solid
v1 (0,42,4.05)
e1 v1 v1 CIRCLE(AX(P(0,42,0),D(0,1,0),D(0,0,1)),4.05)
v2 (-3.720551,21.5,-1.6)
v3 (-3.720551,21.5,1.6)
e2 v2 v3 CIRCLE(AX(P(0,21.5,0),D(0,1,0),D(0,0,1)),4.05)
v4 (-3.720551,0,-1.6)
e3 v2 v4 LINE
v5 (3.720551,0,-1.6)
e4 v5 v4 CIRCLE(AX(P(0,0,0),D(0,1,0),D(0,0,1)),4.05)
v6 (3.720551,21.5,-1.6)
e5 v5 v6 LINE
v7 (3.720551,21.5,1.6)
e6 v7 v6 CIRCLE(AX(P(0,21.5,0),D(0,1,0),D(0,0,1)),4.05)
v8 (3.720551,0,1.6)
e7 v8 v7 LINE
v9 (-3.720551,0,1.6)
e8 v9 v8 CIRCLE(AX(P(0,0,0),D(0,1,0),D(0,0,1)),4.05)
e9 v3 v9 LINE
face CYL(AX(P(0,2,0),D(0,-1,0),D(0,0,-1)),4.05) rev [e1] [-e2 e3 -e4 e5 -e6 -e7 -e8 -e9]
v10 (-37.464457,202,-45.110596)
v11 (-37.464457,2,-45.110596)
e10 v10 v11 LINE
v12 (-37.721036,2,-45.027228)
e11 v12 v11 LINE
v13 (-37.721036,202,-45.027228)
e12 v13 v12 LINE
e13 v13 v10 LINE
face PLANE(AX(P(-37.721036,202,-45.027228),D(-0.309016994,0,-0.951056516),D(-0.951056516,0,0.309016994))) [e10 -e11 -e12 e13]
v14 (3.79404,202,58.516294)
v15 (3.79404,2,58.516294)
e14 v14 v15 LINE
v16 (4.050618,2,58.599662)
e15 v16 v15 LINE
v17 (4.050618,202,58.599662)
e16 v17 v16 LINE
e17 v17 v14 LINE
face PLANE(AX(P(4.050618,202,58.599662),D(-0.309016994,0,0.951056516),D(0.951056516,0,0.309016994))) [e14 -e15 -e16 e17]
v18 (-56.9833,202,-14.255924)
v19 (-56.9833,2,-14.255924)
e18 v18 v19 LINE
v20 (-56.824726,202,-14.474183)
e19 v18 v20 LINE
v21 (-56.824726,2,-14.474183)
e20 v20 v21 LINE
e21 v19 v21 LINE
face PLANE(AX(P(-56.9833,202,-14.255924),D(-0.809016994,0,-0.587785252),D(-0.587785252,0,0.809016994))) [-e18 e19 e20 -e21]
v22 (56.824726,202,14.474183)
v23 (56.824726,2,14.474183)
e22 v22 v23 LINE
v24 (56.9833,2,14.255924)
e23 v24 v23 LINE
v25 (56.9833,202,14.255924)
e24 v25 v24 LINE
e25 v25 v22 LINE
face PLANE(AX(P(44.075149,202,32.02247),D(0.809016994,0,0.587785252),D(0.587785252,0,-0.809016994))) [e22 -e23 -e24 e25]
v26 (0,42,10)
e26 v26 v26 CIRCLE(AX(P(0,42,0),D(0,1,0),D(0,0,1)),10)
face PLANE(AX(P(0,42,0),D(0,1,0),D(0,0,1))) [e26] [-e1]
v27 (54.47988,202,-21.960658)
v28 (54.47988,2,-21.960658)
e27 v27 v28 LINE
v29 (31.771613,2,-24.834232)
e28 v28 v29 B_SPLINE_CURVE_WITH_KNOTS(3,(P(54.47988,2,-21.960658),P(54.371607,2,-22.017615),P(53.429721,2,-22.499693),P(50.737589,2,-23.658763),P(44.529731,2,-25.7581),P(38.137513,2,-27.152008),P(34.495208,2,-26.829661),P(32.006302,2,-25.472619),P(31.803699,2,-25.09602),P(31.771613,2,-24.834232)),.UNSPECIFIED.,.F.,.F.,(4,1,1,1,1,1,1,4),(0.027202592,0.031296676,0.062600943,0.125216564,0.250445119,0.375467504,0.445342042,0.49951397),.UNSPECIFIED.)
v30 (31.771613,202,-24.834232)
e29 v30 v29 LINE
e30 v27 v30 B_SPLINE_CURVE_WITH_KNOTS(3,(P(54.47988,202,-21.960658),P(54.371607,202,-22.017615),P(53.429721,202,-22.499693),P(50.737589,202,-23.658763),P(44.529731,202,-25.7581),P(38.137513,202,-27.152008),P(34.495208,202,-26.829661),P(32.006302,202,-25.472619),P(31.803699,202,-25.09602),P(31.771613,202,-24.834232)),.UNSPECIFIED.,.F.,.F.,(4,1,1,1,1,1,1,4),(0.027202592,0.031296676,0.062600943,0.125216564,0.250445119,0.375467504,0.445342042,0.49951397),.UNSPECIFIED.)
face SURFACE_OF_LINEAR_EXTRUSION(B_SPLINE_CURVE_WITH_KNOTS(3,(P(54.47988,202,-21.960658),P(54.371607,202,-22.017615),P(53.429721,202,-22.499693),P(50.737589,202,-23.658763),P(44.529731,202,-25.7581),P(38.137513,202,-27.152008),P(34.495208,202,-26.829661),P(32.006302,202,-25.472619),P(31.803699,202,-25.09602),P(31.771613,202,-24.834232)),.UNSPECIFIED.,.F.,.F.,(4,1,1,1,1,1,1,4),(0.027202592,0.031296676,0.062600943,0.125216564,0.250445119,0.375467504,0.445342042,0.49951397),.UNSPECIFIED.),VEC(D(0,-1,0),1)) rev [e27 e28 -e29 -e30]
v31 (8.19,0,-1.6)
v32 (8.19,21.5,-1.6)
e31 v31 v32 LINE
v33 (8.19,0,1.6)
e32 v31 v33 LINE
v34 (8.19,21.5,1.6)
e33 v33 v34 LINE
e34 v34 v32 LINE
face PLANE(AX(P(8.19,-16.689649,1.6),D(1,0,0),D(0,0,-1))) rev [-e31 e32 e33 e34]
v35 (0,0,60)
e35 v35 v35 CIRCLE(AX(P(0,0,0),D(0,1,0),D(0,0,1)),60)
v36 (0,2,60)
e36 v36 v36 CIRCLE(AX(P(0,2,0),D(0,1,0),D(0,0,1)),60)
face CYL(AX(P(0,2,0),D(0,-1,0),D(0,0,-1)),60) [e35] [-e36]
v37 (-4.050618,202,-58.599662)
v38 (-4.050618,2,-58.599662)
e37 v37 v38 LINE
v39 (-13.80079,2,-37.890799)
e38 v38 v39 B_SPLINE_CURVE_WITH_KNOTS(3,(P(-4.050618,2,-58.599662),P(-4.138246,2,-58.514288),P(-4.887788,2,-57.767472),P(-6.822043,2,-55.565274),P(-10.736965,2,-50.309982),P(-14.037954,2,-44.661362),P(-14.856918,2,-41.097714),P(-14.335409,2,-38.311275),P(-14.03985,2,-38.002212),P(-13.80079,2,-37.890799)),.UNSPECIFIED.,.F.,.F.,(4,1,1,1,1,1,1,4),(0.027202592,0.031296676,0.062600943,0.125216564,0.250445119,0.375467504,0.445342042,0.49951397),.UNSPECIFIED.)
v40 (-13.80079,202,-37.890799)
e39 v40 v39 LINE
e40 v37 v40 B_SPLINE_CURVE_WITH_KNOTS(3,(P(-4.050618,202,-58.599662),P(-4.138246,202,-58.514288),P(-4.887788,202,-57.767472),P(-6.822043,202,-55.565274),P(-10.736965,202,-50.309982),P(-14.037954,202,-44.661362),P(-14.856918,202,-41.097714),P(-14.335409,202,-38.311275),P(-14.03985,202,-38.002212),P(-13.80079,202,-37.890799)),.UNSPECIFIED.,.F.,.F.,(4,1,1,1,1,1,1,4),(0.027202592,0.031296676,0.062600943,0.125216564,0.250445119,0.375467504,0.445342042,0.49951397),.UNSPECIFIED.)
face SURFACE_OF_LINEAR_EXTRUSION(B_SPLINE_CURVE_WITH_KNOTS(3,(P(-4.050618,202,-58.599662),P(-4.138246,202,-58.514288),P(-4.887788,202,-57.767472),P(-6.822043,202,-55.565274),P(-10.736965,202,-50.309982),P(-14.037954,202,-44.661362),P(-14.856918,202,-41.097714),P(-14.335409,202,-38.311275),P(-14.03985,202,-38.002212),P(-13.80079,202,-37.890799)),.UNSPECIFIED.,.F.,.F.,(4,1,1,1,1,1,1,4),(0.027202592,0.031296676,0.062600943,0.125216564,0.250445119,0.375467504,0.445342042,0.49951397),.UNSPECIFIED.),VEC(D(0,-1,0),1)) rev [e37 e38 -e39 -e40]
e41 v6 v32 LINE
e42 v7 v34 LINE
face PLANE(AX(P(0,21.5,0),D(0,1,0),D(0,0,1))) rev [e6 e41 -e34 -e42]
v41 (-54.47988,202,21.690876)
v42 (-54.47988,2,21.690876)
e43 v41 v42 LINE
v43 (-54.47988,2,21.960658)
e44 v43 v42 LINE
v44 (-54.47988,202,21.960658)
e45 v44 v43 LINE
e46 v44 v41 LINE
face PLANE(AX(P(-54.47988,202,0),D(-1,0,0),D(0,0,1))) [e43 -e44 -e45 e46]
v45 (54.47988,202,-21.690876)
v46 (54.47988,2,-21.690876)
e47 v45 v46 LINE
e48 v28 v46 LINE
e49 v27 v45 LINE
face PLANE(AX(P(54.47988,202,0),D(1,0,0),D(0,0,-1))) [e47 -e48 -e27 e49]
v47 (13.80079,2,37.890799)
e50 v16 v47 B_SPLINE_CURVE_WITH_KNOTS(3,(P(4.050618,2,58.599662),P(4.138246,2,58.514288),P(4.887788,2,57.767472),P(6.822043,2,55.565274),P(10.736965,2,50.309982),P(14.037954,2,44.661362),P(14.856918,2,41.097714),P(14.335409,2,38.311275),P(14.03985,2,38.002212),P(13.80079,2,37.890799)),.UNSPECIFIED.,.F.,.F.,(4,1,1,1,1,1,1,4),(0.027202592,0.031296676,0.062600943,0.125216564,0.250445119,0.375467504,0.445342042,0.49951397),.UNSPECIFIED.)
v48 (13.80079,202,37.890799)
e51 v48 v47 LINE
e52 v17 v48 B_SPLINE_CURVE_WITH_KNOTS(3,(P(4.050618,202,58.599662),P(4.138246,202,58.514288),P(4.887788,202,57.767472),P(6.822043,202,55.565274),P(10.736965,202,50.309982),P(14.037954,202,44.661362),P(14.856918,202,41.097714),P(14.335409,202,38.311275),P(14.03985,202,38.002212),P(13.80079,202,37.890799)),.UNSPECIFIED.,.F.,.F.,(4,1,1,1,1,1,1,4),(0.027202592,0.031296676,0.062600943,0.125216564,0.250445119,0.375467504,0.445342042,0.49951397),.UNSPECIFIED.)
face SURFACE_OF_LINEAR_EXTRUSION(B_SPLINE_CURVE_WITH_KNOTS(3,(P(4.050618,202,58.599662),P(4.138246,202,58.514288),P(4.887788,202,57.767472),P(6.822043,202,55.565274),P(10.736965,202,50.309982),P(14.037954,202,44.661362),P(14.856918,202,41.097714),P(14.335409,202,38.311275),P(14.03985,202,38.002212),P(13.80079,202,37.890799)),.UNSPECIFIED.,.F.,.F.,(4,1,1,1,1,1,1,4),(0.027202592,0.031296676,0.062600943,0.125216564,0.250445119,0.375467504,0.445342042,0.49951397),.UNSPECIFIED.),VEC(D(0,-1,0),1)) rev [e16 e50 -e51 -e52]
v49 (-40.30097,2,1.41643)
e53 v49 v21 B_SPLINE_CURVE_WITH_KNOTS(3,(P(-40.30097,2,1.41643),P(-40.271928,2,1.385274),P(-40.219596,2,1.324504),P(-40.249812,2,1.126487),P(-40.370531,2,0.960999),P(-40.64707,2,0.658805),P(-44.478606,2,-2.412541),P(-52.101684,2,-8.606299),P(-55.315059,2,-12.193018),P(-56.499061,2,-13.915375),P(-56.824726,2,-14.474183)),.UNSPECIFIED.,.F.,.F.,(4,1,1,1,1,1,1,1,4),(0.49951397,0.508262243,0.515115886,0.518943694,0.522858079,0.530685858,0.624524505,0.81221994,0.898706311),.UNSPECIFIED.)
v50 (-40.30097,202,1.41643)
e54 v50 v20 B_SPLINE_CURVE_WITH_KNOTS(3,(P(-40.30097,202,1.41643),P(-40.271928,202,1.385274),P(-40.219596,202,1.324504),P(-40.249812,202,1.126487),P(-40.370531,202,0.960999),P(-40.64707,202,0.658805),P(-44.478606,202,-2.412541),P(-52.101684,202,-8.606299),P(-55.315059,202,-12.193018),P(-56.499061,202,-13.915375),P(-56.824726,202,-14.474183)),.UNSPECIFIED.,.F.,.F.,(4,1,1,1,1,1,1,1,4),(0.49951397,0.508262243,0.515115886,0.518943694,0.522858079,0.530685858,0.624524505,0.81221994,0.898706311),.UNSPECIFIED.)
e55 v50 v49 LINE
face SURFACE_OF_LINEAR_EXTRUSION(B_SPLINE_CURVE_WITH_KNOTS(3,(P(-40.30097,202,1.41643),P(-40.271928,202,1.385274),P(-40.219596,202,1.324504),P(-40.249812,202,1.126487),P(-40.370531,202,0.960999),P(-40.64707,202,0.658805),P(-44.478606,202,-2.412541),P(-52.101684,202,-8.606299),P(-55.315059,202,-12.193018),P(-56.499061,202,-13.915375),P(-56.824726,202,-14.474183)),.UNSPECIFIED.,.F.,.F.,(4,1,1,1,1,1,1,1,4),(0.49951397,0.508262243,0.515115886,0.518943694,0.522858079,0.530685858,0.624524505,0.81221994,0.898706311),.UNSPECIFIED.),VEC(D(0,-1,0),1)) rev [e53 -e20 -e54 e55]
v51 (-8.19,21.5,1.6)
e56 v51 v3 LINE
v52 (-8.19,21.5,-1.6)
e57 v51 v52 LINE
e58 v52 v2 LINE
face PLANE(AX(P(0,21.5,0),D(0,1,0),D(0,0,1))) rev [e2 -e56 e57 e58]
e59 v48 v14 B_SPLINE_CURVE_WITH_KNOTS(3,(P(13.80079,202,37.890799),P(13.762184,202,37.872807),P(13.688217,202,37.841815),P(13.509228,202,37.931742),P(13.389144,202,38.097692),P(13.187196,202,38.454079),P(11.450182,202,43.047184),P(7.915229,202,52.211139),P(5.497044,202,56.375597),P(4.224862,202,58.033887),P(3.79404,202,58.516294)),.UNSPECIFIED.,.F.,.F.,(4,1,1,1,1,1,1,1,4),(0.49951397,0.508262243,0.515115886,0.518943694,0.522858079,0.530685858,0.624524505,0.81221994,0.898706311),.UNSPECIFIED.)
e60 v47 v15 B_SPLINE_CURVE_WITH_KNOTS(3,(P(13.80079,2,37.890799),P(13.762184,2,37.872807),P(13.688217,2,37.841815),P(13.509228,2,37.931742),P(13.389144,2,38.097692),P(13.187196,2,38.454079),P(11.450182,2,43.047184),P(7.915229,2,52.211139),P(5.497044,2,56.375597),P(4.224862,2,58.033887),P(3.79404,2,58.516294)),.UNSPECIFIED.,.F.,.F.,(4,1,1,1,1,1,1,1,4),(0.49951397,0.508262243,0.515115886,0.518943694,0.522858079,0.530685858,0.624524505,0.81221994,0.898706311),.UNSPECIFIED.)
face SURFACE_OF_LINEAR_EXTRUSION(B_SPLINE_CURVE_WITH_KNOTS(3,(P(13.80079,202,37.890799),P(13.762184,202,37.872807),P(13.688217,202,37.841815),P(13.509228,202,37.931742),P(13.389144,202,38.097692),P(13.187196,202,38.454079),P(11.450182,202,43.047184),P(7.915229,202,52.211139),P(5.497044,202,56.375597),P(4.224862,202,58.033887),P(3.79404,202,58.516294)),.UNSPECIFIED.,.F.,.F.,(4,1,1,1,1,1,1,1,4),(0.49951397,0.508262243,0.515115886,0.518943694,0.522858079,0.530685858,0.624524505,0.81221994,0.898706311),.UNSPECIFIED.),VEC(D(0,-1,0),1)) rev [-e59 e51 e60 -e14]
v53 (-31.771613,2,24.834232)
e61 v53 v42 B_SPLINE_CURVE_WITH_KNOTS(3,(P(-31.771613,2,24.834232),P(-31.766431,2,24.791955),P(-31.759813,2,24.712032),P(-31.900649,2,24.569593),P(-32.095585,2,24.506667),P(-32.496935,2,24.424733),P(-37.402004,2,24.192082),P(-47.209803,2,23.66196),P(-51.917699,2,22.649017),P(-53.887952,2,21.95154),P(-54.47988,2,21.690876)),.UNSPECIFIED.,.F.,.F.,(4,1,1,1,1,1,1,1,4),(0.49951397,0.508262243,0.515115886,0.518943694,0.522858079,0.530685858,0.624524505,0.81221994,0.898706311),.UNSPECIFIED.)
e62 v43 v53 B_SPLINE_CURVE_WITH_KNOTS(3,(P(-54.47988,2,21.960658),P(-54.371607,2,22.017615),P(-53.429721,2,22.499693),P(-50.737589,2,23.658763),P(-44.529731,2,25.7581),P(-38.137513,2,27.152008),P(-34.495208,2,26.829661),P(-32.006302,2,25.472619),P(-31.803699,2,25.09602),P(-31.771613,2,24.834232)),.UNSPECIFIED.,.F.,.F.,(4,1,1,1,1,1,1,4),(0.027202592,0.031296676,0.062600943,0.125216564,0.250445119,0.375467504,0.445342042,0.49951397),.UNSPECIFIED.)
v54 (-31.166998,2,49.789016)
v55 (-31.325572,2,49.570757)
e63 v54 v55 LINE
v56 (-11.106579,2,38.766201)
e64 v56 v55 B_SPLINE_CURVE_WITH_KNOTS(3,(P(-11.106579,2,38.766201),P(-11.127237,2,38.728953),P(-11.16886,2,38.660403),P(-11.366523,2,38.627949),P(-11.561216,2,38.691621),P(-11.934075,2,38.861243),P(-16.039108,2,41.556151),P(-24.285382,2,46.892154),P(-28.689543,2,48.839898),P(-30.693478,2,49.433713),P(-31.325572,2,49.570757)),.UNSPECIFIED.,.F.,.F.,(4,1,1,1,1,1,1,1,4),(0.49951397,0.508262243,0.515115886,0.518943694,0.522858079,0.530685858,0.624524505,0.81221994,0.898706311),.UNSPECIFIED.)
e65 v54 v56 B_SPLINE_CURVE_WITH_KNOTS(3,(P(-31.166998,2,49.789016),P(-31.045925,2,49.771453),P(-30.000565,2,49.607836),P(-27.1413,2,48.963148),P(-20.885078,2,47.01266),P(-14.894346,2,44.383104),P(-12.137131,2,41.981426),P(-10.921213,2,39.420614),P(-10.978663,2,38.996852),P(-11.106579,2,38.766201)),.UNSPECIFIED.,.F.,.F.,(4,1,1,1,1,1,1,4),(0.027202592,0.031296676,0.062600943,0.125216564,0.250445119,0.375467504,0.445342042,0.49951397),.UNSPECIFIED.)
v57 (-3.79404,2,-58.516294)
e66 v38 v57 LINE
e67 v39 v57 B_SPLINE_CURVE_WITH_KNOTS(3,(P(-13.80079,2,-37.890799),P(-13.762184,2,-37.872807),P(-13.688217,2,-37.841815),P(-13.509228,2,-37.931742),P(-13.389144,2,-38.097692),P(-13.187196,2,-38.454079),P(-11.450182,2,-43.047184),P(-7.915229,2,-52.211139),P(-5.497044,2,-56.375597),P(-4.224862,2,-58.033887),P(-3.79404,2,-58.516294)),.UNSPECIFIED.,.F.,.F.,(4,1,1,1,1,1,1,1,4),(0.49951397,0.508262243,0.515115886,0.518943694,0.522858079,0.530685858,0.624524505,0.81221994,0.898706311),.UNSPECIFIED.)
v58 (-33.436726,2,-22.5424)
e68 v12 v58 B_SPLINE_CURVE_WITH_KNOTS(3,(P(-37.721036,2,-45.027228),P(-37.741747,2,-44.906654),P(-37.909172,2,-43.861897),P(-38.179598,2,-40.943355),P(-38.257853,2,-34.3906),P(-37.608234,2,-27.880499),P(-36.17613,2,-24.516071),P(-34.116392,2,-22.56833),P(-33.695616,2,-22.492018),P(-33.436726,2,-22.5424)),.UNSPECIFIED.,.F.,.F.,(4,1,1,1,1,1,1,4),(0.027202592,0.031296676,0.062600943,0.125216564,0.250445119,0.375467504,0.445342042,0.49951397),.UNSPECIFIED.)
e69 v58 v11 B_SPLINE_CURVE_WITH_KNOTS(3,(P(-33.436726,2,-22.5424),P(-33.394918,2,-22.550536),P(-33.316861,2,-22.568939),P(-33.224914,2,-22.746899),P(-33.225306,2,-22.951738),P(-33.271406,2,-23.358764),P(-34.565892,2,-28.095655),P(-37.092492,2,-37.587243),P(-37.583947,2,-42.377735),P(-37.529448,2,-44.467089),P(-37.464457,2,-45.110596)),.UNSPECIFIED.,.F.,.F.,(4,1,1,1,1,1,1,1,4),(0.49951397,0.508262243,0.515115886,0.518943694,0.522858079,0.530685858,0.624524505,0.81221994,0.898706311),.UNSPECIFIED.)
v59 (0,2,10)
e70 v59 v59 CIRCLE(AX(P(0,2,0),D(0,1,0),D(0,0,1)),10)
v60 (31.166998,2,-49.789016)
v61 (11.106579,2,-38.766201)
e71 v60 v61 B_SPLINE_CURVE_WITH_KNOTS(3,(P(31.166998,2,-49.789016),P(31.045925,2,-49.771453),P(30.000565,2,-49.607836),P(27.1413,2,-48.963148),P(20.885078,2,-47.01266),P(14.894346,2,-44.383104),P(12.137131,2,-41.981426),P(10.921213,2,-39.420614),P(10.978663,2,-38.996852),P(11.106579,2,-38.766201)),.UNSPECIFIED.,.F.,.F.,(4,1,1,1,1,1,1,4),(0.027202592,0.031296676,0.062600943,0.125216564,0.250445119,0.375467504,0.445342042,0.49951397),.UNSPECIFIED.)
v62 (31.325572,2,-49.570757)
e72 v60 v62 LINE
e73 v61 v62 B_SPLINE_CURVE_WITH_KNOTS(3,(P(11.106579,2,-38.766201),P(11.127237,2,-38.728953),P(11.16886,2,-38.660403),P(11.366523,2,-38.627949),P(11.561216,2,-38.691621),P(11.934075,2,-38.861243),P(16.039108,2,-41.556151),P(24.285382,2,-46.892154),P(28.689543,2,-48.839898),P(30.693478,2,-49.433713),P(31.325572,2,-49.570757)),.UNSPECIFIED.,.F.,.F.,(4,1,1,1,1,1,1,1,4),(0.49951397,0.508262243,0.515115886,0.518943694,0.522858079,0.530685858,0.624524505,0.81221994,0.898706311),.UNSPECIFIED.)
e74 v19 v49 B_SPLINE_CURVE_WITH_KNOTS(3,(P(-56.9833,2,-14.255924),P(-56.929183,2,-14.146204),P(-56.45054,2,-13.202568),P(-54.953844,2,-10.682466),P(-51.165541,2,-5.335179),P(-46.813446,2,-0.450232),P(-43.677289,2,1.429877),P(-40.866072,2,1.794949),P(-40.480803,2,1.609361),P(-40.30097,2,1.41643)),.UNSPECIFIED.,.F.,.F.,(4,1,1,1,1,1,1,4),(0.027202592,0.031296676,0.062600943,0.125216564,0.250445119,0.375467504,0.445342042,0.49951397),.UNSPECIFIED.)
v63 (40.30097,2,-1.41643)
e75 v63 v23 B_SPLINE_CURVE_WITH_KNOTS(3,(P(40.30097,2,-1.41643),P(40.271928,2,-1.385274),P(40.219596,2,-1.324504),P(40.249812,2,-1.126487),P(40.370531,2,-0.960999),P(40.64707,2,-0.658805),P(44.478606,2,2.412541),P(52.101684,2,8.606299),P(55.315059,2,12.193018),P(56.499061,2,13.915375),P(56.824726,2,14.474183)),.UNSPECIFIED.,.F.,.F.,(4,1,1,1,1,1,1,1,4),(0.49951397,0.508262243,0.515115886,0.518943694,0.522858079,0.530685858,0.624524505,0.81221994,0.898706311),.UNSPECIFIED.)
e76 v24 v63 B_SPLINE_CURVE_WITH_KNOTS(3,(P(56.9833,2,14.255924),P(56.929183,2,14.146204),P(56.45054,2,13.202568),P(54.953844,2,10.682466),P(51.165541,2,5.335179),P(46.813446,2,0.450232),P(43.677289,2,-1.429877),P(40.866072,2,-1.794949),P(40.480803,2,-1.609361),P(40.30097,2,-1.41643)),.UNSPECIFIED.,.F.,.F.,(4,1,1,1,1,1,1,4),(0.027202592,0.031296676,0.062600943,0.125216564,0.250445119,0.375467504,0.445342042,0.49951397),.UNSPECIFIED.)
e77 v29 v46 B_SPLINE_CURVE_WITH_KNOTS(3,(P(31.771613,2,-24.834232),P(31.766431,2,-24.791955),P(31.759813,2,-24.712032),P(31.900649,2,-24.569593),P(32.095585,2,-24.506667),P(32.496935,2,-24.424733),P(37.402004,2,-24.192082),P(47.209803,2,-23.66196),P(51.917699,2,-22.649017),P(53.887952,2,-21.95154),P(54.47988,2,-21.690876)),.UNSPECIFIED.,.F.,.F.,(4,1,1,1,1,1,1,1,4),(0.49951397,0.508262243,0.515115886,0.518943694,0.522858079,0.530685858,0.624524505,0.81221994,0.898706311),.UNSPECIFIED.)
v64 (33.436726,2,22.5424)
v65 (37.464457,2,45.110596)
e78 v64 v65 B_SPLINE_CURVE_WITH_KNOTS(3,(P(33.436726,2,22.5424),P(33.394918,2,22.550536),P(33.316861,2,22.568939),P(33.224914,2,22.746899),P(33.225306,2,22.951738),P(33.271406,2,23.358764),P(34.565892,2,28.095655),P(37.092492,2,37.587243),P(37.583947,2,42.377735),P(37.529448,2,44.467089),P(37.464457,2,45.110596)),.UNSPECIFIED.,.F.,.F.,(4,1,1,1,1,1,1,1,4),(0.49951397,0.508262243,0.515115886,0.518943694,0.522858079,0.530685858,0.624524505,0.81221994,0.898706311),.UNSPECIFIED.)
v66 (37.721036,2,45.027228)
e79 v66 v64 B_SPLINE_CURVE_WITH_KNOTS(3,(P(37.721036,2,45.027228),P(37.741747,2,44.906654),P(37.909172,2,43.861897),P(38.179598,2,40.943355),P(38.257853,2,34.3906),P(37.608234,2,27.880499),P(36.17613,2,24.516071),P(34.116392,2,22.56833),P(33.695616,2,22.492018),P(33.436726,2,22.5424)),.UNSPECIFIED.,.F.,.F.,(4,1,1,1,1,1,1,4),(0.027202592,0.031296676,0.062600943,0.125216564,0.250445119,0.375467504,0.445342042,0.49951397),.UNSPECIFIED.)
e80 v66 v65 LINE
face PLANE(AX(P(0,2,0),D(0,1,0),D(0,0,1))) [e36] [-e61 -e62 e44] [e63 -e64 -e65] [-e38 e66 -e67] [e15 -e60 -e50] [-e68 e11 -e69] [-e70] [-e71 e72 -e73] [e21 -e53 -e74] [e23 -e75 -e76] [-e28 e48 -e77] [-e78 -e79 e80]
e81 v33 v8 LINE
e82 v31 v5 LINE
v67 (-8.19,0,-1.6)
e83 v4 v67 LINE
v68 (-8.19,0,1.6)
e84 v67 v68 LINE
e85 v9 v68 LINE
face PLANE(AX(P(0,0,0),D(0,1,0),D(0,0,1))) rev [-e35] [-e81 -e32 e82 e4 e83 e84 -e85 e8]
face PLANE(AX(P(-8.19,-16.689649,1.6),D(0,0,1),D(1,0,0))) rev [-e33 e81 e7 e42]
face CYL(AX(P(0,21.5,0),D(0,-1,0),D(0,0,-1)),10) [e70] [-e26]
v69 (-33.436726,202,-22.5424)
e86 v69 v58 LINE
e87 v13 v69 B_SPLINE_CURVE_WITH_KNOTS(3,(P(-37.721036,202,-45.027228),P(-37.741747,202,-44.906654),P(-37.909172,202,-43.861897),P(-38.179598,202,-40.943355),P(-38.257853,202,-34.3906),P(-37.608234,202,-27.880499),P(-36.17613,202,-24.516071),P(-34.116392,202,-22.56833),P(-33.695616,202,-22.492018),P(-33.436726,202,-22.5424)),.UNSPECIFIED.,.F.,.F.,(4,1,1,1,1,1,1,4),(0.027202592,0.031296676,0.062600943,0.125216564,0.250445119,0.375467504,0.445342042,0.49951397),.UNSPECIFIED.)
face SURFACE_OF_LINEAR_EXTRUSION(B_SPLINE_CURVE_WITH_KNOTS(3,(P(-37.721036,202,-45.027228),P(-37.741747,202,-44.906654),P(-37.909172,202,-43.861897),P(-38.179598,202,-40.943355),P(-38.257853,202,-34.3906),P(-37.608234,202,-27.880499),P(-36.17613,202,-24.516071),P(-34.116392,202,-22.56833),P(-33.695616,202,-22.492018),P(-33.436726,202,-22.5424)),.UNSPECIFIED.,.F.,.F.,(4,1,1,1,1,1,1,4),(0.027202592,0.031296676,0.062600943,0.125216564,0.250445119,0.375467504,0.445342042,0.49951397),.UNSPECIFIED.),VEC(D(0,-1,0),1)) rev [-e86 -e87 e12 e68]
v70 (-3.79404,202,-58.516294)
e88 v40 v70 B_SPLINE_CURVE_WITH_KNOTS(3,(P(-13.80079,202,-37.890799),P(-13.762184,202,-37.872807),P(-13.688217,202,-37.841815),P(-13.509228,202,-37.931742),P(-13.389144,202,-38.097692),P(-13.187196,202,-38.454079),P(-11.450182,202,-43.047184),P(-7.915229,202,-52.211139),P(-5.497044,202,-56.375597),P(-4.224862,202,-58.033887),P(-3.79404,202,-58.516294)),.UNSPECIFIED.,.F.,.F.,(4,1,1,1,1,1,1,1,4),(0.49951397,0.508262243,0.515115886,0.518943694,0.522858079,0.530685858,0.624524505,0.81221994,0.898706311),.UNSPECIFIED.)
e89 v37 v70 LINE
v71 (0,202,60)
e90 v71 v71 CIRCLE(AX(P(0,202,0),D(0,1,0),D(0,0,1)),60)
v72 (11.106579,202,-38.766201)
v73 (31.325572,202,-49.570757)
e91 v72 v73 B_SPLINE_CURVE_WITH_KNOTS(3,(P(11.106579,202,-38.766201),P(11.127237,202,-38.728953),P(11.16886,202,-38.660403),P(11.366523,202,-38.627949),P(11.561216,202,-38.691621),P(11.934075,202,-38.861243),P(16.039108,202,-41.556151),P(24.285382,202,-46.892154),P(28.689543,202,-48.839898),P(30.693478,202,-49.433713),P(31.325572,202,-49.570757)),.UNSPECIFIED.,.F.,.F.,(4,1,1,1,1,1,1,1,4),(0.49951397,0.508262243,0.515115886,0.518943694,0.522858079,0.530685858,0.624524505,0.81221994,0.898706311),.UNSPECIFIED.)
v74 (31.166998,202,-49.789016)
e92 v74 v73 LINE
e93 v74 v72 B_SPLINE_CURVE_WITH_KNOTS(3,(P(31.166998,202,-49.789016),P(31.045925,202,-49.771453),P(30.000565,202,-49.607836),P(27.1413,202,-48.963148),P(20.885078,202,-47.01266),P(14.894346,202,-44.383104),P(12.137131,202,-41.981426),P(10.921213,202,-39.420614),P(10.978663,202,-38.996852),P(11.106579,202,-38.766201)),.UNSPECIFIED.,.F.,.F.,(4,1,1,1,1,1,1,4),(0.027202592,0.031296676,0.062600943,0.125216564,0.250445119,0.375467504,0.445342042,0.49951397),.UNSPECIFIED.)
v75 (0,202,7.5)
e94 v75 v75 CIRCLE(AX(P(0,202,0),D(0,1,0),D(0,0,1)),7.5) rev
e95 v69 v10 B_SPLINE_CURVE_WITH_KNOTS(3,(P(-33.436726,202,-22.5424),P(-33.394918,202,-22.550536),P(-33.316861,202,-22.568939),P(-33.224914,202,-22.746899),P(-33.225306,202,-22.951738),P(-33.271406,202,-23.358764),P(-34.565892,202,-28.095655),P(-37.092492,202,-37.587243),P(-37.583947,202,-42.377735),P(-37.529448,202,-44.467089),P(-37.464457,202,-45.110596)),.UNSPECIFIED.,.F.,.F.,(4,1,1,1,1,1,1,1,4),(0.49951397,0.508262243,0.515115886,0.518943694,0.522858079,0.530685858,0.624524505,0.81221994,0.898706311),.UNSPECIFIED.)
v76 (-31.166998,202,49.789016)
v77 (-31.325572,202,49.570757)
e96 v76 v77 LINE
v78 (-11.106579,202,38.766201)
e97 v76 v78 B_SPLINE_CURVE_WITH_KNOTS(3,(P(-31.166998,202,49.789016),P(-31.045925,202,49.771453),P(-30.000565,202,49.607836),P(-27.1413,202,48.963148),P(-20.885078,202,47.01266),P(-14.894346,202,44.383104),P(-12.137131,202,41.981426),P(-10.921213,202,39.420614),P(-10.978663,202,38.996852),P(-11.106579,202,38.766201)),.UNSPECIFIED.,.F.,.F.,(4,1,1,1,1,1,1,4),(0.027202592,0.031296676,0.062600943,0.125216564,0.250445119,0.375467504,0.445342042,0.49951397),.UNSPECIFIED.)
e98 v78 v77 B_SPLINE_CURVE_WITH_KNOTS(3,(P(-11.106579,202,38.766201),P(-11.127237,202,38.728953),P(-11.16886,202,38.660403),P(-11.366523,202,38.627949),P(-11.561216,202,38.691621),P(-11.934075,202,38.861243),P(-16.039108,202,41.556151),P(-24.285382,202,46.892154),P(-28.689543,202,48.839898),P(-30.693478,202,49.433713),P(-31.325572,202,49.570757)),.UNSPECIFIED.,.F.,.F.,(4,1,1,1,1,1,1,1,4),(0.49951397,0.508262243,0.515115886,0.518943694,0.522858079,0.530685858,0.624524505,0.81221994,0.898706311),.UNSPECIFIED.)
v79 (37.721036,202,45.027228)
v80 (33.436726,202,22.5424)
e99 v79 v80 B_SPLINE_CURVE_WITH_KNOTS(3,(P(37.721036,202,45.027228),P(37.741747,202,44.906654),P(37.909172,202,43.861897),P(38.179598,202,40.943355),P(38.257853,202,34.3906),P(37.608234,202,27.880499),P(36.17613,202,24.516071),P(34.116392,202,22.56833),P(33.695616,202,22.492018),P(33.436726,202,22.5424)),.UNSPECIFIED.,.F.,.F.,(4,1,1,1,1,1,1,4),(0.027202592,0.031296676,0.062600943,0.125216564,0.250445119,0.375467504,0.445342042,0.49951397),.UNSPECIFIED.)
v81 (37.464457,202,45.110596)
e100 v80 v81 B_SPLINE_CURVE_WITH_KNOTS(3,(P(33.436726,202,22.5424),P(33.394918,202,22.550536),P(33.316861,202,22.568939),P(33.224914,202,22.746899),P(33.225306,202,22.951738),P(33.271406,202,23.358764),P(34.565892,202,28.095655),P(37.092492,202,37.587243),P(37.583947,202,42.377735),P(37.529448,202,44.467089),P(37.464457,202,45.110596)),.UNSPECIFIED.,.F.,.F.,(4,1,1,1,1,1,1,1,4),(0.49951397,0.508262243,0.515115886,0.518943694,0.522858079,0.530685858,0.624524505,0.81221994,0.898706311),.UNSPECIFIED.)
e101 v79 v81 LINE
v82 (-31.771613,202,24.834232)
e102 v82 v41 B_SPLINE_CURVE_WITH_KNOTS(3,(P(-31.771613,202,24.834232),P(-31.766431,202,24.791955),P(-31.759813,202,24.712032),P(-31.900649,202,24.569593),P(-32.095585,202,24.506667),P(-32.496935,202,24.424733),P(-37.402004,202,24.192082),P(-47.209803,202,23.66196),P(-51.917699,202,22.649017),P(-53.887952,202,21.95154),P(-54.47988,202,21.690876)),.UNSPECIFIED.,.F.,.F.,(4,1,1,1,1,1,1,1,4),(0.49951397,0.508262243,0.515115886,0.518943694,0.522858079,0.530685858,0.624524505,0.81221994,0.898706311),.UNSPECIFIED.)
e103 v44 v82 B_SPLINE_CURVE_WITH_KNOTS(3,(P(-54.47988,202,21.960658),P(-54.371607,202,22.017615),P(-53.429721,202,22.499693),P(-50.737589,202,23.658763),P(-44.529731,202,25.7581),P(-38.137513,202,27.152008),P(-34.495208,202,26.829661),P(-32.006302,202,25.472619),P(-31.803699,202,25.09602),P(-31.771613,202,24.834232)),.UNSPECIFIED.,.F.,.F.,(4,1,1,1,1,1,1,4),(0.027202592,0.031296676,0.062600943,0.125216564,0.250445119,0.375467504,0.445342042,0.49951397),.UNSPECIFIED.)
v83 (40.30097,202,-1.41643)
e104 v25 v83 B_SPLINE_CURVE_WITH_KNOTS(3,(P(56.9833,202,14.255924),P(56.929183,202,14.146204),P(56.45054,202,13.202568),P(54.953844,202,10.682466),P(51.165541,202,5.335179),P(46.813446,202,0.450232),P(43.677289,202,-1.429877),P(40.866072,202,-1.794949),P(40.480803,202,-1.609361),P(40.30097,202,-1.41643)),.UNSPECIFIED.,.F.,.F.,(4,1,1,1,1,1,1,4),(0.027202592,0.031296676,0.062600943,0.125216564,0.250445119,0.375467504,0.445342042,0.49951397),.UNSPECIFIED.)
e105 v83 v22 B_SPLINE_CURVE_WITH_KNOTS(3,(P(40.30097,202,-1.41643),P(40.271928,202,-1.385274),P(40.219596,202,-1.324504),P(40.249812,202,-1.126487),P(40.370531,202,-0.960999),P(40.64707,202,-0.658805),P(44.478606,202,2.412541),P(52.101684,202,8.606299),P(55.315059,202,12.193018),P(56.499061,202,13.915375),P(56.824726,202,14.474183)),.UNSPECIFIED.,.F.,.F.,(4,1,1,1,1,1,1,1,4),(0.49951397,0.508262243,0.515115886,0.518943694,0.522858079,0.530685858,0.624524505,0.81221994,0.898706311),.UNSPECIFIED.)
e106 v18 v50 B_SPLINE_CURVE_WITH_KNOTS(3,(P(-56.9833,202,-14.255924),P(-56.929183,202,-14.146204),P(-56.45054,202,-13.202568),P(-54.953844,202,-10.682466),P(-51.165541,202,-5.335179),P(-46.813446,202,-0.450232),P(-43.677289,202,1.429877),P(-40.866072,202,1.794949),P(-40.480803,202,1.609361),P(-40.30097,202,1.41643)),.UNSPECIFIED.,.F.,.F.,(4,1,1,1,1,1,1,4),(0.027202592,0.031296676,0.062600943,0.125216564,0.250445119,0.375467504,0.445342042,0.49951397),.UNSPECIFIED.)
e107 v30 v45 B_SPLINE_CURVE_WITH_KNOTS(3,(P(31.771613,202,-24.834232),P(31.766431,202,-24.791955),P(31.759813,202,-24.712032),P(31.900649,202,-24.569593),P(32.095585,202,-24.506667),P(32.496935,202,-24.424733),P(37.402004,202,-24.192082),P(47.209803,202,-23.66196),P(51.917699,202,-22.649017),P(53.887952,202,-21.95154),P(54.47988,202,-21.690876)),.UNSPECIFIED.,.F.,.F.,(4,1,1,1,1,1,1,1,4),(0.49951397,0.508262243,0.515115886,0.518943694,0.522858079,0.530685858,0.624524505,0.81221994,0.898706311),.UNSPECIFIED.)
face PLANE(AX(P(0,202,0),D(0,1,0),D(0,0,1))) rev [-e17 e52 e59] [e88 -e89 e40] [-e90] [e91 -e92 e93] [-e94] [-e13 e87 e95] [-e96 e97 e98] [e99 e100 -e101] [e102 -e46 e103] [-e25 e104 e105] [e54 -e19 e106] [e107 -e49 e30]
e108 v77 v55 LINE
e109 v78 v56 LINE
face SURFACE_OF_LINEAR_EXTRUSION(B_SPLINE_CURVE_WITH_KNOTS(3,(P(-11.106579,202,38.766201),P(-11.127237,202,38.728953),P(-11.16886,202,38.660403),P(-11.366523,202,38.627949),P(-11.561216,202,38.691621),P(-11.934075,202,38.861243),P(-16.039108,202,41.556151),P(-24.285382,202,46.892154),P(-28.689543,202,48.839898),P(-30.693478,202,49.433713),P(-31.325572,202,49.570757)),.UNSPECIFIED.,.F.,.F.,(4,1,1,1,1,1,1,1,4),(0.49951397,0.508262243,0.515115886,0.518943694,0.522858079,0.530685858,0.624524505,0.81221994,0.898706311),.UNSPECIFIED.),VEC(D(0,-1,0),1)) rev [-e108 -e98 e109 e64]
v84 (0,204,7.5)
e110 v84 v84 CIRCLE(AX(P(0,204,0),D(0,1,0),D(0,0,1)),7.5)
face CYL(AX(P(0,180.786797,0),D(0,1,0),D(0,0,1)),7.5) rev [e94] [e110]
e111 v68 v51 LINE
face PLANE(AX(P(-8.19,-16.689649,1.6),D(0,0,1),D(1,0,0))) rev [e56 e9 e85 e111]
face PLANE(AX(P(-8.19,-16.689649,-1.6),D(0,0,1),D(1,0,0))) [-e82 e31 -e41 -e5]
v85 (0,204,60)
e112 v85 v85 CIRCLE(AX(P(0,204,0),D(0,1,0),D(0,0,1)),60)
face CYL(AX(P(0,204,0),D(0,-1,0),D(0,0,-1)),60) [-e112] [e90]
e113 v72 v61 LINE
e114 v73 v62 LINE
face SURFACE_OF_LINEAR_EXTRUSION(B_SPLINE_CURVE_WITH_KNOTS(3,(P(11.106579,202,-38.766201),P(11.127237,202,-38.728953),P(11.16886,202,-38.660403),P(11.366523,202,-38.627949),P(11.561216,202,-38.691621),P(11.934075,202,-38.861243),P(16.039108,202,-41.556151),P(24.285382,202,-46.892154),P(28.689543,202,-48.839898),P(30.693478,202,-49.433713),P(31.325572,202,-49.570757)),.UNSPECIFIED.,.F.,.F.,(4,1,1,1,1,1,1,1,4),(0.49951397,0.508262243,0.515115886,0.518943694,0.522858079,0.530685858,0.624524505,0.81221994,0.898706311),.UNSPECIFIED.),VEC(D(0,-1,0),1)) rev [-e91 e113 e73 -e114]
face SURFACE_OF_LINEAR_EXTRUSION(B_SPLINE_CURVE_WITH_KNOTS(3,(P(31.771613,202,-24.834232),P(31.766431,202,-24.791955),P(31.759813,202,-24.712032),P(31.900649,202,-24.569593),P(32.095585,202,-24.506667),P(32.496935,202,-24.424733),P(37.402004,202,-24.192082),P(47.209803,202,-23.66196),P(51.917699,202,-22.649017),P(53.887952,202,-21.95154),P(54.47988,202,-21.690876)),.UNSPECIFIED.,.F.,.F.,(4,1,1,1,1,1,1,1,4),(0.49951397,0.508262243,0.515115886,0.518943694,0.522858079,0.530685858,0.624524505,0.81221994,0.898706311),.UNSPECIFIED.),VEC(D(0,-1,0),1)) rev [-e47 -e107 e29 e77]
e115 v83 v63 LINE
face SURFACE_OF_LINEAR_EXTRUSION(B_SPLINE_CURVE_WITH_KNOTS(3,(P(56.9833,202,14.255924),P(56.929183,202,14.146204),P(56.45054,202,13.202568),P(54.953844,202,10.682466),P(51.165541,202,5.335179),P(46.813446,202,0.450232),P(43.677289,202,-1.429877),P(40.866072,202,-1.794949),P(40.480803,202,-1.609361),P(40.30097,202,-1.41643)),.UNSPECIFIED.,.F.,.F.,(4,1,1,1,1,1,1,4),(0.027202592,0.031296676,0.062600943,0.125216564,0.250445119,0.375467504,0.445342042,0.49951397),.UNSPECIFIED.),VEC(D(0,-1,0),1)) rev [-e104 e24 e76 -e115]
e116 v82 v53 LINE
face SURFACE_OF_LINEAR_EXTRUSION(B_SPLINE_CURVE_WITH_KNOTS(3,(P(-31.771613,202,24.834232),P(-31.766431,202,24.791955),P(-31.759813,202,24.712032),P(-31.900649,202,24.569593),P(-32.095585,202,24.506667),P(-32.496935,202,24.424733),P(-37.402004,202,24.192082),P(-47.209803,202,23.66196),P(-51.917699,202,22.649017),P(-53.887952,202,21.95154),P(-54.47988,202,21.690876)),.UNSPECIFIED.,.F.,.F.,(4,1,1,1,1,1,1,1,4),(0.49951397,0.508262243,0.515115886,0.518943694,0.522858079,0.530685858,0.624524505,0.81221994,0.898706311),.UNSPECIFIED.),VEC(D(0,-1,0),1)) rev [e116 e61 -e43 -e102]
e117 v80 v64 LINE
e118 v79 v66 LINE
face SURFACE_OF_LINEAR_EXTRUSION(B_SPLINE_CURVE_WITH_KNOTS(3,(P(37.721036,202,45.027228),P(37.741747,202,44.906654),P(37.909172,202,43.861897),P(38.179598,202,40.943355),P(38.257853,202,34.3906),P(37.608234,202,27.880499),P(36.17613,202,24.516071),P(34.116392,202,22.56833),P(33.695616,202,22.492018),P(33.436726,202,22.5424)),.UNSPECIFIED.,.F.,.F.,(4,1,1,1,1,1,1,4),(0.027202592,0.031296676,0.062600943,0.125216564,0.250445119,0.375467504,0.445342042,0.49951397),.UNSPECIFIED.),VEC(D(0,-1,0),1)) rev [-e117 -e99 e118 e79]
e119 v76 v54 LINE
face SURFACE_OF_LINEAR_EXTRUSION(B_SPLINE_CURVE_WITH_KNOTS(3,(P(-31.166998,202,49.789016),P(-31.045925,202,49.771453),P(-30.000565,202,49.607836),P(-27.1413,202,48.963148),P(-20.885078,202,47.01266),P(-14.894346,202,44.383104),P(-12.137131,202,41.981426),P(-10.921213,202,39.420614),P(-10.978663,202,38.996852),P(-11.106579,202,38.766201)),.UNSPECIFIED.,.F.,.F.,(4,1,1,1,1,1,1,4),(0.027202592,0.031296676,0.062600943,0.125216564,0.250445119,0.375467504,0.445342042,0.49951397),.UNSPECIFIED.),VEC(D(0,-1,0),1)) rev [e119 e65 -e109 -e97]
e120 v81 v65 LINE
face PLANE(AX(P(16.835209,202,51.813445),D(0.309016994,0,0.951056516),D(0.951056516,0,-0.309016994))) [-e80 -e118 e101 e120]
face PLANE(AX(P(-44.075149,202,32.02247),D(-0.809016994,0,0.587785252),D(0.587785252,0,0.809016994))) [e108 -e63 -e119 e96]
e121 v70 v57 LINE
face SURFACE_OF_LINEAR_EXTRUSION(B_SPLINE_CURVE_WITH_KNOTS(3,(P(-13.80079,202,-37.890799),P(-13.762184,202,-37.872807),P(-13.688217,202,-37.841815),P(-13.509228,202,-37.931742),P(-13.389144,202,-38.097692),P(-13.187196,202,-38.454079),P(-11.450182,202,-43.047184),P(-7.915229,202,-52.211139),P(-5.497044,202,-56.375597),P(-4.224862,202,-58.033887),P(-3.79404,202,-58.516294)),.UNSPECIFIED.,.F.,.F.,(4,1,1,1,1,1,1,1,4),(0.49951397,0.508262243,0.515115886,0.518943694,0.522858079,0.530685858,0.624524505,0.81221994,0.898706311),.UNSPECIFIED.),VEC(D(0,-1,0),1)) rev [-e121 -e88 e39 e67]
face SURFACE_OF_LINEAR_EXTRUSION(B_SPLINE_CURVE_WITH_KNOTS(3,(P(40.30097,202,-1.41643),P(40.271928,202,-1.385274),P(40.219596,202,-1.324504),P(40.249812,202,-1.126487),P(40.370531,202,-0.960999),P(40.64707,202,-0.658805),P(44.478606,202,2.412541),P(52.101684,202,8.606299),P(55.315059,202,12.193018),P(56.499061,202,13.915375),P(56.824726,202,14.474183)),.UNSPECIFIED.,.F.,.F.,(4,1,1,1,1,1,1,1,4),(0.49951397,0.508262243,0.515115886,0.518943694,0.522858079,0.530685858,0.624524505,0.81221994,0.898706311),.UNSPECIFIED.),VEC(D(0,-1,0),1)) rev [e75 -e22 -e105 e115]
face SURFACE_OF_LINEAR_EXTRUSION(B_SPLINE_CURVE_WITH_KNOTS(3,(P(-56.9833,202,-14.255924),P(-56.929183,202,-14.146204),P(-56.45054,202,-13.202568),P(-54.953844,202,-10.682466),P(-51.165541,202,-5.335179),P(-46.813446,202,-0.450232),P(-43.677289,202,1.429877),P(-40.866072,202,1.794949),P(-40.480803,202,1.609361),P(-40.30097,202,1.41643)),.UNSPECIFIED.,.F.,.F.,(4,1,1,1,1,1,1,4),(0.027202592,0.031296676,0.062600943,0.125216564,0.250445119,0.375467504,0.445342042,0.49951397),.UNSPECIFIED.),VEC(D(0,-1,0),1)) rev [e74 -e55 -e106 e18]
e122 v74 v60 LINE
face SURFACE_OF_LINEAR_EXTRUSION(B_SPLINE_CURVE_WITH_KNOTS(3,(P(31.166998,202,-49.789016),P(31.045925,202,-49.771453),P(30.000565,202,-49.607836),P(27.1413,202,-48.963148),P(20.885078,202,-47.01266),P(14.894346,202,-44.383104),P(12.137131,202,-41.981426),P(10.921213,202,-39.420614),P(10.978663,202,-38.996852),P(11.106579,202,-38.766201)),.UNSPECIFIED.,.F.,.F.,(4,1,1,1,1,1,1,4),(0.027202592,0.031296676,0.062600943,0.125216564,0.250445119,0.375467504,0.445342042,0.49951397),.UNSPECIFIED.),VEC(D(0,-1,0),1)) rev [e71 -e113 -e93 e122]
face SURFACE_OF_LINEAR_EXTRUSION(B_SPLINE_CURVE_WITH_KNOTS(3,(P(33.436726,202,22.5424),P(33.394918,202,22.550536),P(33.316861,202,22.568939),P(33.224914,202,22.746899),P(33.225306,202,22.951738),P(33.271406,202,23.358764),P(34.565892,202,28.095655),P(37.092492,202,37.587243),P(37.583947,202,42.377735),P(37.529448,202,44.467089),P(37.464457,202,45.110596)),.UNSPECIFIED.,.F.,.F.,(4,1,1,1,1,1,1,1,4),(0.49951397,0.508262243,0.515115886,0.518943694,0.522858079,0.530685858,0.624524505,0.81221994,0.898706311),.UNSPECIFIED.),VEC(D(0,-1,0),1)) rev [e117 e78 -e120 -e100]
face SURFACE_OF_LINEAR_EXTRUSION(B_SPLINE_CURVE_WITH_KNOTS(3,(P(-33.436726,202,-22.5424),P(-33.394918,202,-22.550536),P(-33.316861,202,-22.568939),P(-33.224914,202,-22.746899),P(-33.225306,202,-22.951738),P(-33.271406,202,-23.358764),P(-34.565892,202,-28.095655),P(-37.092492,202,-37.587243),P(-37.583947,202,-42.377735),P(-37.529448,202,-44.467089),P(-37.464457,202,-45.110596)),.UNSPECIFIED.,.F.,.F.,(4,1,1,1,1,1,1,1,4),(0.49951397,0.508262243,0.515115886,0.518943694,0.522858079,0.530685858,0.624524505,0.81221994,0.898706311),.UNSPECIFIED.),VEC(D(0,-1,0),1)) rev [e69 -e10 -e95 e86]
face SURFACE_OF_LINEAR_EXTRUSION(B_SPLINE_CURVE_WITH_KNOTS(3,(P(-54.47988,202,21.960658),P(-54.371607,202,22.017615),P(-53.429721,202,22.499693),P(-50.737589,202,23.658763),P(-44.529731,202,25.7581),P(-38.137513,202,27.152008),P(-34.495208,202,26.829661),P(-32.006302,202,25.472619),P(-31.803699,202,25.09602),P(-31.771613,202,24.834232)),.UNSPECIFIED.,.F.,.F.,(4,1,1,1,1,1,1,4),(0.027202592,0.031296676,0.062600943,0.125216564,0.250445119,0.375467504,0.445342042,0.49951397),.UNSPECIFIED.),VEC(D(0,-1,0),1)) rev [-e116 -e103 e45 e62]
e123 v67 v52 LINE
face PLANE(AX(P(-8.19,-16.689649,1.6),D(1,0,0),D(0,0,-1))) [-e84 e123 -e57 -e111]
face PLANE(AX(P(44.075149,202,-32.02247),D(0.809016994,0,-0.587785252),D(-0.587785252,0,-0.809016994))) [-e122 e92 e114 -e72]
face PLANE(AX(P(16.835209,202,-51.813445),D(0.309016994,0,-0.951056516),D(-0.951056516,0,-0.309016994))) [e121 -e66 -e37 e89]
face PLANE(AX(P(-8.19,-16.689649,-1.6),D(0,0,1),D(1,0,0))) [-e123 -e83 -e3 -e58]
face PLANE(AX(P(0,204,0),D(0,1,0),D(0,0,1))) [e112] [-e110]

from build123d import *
from build123d.topology import SkipClean

# Parameters (mm, degrees)
SKETCH1_R               = 60
SKETCH1_R_2             = 4.05
BOSS_EXTRUDE1_DEPTH     = 2
BOSS_EXTRUDE3_DEPTH     = 200
SKETCH6_R               = 60
BOSS_EXTRUDE4_DEPTH     = 2
SKETCH5_3_W             = 16.38
SKETCH5_3_H             = 3.2
CUT_EXTRUDE1_DEPTH      = 2
BOSS_EXTRUDE5_START     = -2
BOSS_EXTRUDE5_OUTLINE_R = 10
BOSS_EXTRUDE5_DEPTH     = 21.5
SKETCH8_R               = 10
SKETCH8_R_2             = 4.05
BOSS_EXTRUDE6_DEPTH     = 20.5
SKETCH7_R               = 7.5
CUT_EXTRUDE2_DEPTH      = 2


with BuildPart() as part:
    # Sketch1 → Boss-Extrude1 (new body)
    with BuildSketch(Plane(origin=(0, 0, 0), x_dir=(1, 0, 0), z_dir=(0, 1, 0))):
        with Locations(Location((0, 0, 0), (0, 0, 270))):
            Circle(SKETCH1_R)
        with Locations(Location((0, 0, 0), (0, 0, 270))):
            Circle(SKETCH1_R_2, mode=Mode.SUBTRACT)
    extrude(amount=BOSS_EXTRUDE1_DEPTH)

    # Sketch5 → Boss-Extrude3 (add)
    with BuildSketch(Plane(origin=(0, 2, 0), x_dir=(1, 0, 0), z_dir=(0, 1, 0))):
        with BuildLine():
            Line((54.47988, 21.960658), (54.47988, 21.690876))
            add(Edge.make_bspline(
                [(31.771613, 24.834232), (31.766431, 24.791955), (31.759813, 24.712032), (31.900649, 24.569593), (32.095585, 24.506667), (32.496935, 24.424733), (37.402004, 24.192082), (47.209803, 23.66196), (51.917699, 22.649017), (53.887952, 21.95154), (54.47988, 21.690876)],
                knots=[0.499514, 0.499514, 0.499514, 0.499514, 0.508262, 0.515116, 0.518944, 0.522858, 0.530686, 0.624525, 0.81222, 0.898706, 0.898706, 0.898706, 0.898706], degree=3))
            add(Edge.make_bspline(
                [(54.47988, 21.960658), (54.371607, 22.017615), (53.429721, 22.499693), (50.737589, 23.658763), (44.529731, 25.7581), (38.137513, 27.152008), (34.495208, 26.829661), (32.006302, 25.472619), (31.803699, 25.09602), (31.771613, 24.834232)],
                knots=[0.027203, 0.027203, 0.027203, 0.027203, 0.031297, 0.062601, 0.125217, 0.250445, 0.375468, 0.445342, 0.499514, 0.499514, 0.499514, 0.499514], degree=3))
        make_face()
        with BuildLine():
            Line((31.166998, 49.789016), (31.325572, 49.570757))
            add(Edge.make_bspline(
                [(11.106579, 38.766201), (11.127237, 38.728953), (11.16886, 38.660403), (11.366523, 38.627949), (11.561216, 38.691621), (11.934075, 38.861243), (16.039108, 41.556151), (24.285382, 46.892154), (28.689543, 48.839898), (30.693478, 49.433713), (31.325572, 49.570757)],
                knots=[0.499514, 0.499514, 0.499514, 0.499514, 0.508262, 0.515116, 0.518944, 0.522858, 0.530686, 0.624525, 0.81222, 0.898706, 0.898706, 0.898706, 0.898706], degree=3))
            add(Edge.make_bspline(
                [(31.166998, 49.789016), (31.045925, 49.771453), (30.000565, 49.607836), (27.1413, 48.963148), (20.885078, 47.01266), (14.894346, 44.383104), (12.137131, 41.981426), (10.921213, 39.420614), (10.978663, 38.996852), (11.106579, 38.766201)],
                knots=[0.027203, 0.027203, 0.027203, 0.027203, 0.031297, 0.062601, 0.125217, 0.250445, 0.375468, 0.445342, 0.499514, 0.499514, 0.499514, 0.499514], degree=3))
        make_face()
        with BuildLine():
            Line((-4.050618, 58.599662), (-3.79404, 58.516294))
            add(Edge.make_bspline(
                [(-13.80079, 37.890799), (-13.762184, 37.872807), (-13.688217, 37.841815), (-13.509228, 37.931742), (-13.389144, 38.097692), (-13.187196, 38.454079), (-11.450182, 43.047184), (-7.915229, 52.211139), (-5.497044, 56.375597), (-4.224862, 58.033887), (-3.79404, 58.516294)],
                knots=[0.499514, 0.499514, 0.499514, 0.499514, 0.508262, 0.515116, 0.518944, 0.522858, 0.530686, 0.624525, 0.81222, 0.898706, 0.898706, 0.898706, 0.898706], degree=3))
            add(Edge.make_bspline(
                [(-4.050618, 58.599662), (-4.138246, 58.514288), (-4.887788, 57.767472), (-6.822043, 55.565274), (-10.736965, 50.309982), (-14.037954, 44.661362), (-14.856918, 41.097714), (-14.335409, 38.311275), (-14.03985, 38.002212), (-13.80079, 37.890799)],
                knots=[0.027203, 0.027203, 0.027203, 0.027203, 0.031297, 0.062601, 0.125217, 0.250445, 0.375468, 0.445342, 0.499514, 0.499514, 0.499514, 0.499514], degree=3))
        make_face()
        with BuildLine():
            Line((-54.47988, -21.960658), (-54.47988, -21.690876))
            add(Edge.make_bspline(
                [(-31.771613, -24.834232), (-31.766431, -24.791955), (-31.759813, -24.712032), (-31.900649, -24.569593), (-32.095585, -24.506667), (-32.496935, -24.424733), (-37.402004, -24.192082), (-47.209803, -23.66196), (-51.917699, -22.649017), (-53.887952, -21.95154), (-54.47988, -21.690876)],
                knots=[0.499514, 0.499514, 0.499514, 0.499514, 0.508262, 0.515116, 0.518944, 0.522858, 0.530686, 0.624525, 0.81222, 0.898706, 0.898706, 0.898706, 0.898706], degree=3))
            add(Edge.make_bspline(
                [(-54.47988, -21.960658), (-54.371607, -22.017615), (-53.429721, -22.499693), (-50.737589, -23.658763), (-44.529731, -25.7581), (-38.137513, -27.152008), (-34.495208, -26.829661), (-32.006302, -25.472619), (-31.803699, -25.09602), (-31.771613, -24.834232)],
                knots=[0.027203, 0.027203, 0.027203, 0.027203, 0.031297, 0.062601, 0.125217, 0.250445, 0.375468, 0.445342, 0.499514, 0.499514, 0.499514, 0.499514], degree=3))
        make_face()
        with BuildLine():
            Line((-31.166998, -49.789016), (-31.325572, -49.570757))
            add(Edge.make_bspline(
                [(-11.106579, -38.766201), (-11.127237, -38.728953), (-11.16886, -38.660403), (-11.366523, -38.627949), (-11.561216, -38.691621), (-11.934075, -38.861243), (-16.039108, -41.556151), (-24.285382, -46.892154), (-28.689543, -48.839898), (-30.693478, -49.433713), (-31.325572, -49.570757)],
                knots=[0.499514, 0.499514, 0.499514, 0.499514, 0.508262, 0.515116, 0.518944, 0.522858, 0.530686, 0.624525, 0.81222, 0.898706, 0.898706, 0.898706, 0.898706], degree=3))
            add(Edge.make_bspline(
                [(-31.166998, -49.789016), (-31.045925, -49.771453), (-30.000565, -49.607836), (-27.1413, -48.963148), (-20.885078, -47.01266), (-14.894346, -44.383104), (-12.137131, -41.981426), (-10.921213, -39.420614), (-10.978663, -38.996852), (-11.106579, -38.766201)],
                knots=[0.027203, 0.027203, 0.027203, 0.027203, 0.031297, 0.062601, 0.125217, 0.250445, 0.375468, 0.445342, 0.499514, 0.499514, 0.499514, 0.499514], degree=3))
        make_face()
        with BuildLine():
            Line((37.721036, -45.027228), (37.464457, -45.110596))
            add(Edge.make_bspline(
                [(33.436726, -22.5424), (33.394918, -22.550536), (33.316861, -22.568939), (33.224914, -22.746899), (33.225306, -22.951738), (33.271406, -23.358764), (34.565892, -28.095655), (37.092492, -37.587243), (37.583947, -42.377735), (37.529448, -44.467089), (37.464457, -45.110596)],
                knots=[0.499514, 0.499514, 0.499514, 0.499514, 0.508262, 0.515116, 0.518944, 0.522858, 0.530686, 0.624525, 0.81222, 0.898706, 0.898706, 0.898706, 0.898706], degree=3))
            add(Edge.make_bspline(
                [(37.721036, -45.027228), (37.741747, -44.906654), (37.909172, -43.861897), (38.179598, -40.943355), (38.257853, -34.3906), (37.608234, -27.880499), (36.17613, -24.516071), (34.116392, -22.56833), (33.695616, -22.492018), (33.436726, -22.5424)],
                knots=[0.027203, 0.027203, 0.027203, 0.027203, 0.031297, 0.062601, 0.125217, 0.250445, 0.375468, 0.445342, 0.499514, 0.499514, 0.499514, 0.499514], degree=3))
        make_face()
        with BuildLine():
            Line((56.9833, -14.255924), (56.824726, -14.474183))
            add(Edge.make_bspline(
                [(40.30097, 1.41643), (40.271928, 1.385274), (40.219596, 1.324504), (40.249812, 1.126487), (40.370531, 0.960999), (40.64707, 0.658805), (44.478606, -2.412541), (52.101684, -8.606299), (55.315059, -12.193018), (56.499061, -13.915375), (56.824726, -14.474183)],
                knots=[0.499514, 0.499514, 0.499514, 0.499514, 0.508262, 0.515116, 0.518944, 0.522858, 0.530686, 0.624525, 0.81222, 0.898706, 0.898706, 0.898706, 0.898706], degree=3))
            add(Edge.make_bspline(
                [(56.9833, -14.255924), (56.929183, -14.146204), (56.45054, -13.202568), (54.953844, -10.682466), (51.165541, -5.335179), (46.813446, -0.450232), (43.677289, 1.429877), (40.866072, 1.794949), (40.480803, 1.609361), (40.30097, 1.41643)],
                knots=[0.027203, 0.027203, 0.027203, 0.027203, 0.031297, 0.062601, 0.125217, 0.250445, 0.375468, 0.445342, 0.499514, 0.499514, 0.499514, 0.499514], degree=3))
        make_face()
        with BuildLine():
            add(Edge.make_bspline(
                [(-37.721036, 45.027228), (-37.741747, 44.906654), (-37.909172, 43.861897), (-38.179598, 40.943355), (-38.257853, 34.3906), (-37.608234, 27.880499), (-36.17613, 24.516071), (-34.116392, 22.56833), (-33.695616, 22.492018), (-33.436726, 22.5424)],
                knots=[0.027203, 0.027203, 0.027203, 0.027203, 0.031297, 0.062601, 0.125217, 0.250445, 0.375468, 0.445342, 0.499514, 0.499514, 0.499514, 0.499514], degree=3))
            add(Edge.make_bspline(
                [(-33.436726, 22.5424), (-33.394918, 22.550536), (-33.316861, 22.568939), (-33.224914, 22.746899), (-33.225306, 22.951738), (-33.271406, 23.358764), (-34.565892, 28.095655), (-37.092492, 37.587243), (-37.583947, 42.377735), (-37.529448, 44.467089), (-37.464457, 45.110596)],
                knots=[0.499514, 0.499514, 0.499514, 0.499514, 0.508262, 0.515116, 0.518944, 0.522858, 0.530686, 0.624525, 0.81222, 0.898706, 0.898706, 0.898706, 0.898706], degree=3))
            Line((-37.464457, 45.110596), (-37.721036, 45.027228))
        make_face()
        with BuildLine():
            add(Edge.make_bspline(
                [(-56.9833, 14.255924), (-56.929183, 14.146204), (-56.45054, 13.202568), (-54.953844, 10.682466), (-51.165541, 5.335179), (-46.813446, 0.450232), (-43.677289, -1.429877), (-40.866072, -1.794949), (-40.480803, -1.609361), (-40.30097, -1.41643)],
                knots=[0.027203, 0.027203, 0.027203, 0.027203, 0.031297, 0.062601, 0.125217, 0.250445, 0.375468, 0.445342, 0.499514, 0.499514, 0.499514, 0.499514], degree=3))
            add(Edge.make_bspline(
                [(-40.30097, -1.41643), (-40.271928, -1.385274), (-40.219596, -1.324504), (-40.249812, -1.126487), (-40.370531, -0.960999), (-40.64707, -0.658805), (-44.478606, 2.412541), (-52.101684, 8.606299), (-55.315059, 12.193018), (-56.499061, 13.915375), (-56.824726, 14.474183)],
                knots=[0.499514, 0.499514, 0.499514, 0.499514, 0.508262, 0.515116, 0.518944, 0.522858, 0.530686, 0.624525, 0.81222, 0.898706, 0.898706, 0.898706, 0.898706], degree=3))
            Line((-56.824726, 14.474183), (-56.9833, 14.255924))
        make_face()
        with BuildLine():
            add(Edge.make_bspline(
                [(13.80079, -37.890799), (13.762184, -37.872807), (13.688217, -37.841815), (13.509228, -37.931742), (13.389144, -38.097692), (13.187196, -38.454079), (11.450182, -43.047184), (7.915229, -52.211139), (5.497044, -56.375597), (4.224862, -58.033887), (3.79404, -58.516294)],
                knots=[0.499514, 0.499514, 0.499514, 0.499514, 0.508262, 0.515116, 0.518944, 0.522858, 0.530686, 0.624525, 0.81222, 0.898706, 0.898706, 0.898706, 0.898706], degree=3))
            Line((3.79404, -58.516294), (4.050618, -58.599662))
            add(Edge.make_bspline(
                [(4.050618, -58.599662), (4.138246, -58.514288), (4.887788, -57.767472), (6.822043, -55.565274), (10.736965, -50.309982), (14.037954, -44.661362), (14.856918, -41.097714), (14.335409, -38.311275), (14.03985, -38.002212), (13.80079, -37.890799)],
                knots=[0.027203, 0.027203, 0.027203, 0.027203, 0.031297, 0.062601, 0.125217, 0.250445, 0.375468, 0.445342, 0.499514, 0.499514, 0.499514, 0.499514], degree=3))
        make_face()
    extrude(amount=BOSS_EXTRUDE3_DEPTH)

    # Sketch6 → Boss-Extrude4 (add)
    with BuildSketch(Plane(origin=(0, 202, 0), x_dir=(1, 0, 0), z_dir=(0, 1, 0))):
        with Locations(Location((0, 0, 0), (0, 0, 270))):
            Circle(SKETCH6_R)
    extrude(amount=BOSS_EXTRUDE4_DEPTH)

    # Sketch5<3> → Cut-Extrude1 (cut)
    with BuildSketch(Plane(origin=(0, 2, 0), x_dir=(1, 0, 0), z_dir=(0, 1, 0))):
        Rectangle(SKETCH5_3_W, SKETCH5_3_H)
    extrude(amount=-CUT_EXTRUDE1_DEPTH, mode=Mode.SUBTRACT)

    # Boss-Extrude5: read off the stored shape, not the designer's step
    # Boss-Extrude5 outline → Boss-Extrude5 (add)
    with SkipClean():  # the faces are left unmerged after this step: merging them gives an invalid solid
        with BuildSketch(Plane(origin=(0, 2, 0), x_dir=(1, 0, 0), z_dir=(0, 1, 0)).offset(BOSS_EXTRUDE5_START)):
            Circle(BOSS_EXTRUDE5_OUTLINE_R)
            with BuildLine():
                Line((-8.19, 1.6), (-3.720551, 1.6))
                ThreePointArc((-3.720551, 1.6), (0, 4.05), (3.720551, 1.6))
                Line((3.720551, 1.6), (8.19, 1.6))
                Line((8.19, 1.6), (8.19, -1.6))
                Line((8.19, -1.6), (3.720551, -1.6))
                ThreePointArc((3.720551, -1.6), (0, -4.05), (-3.720551, -1.6))
                Line((-3.720551, -1.6), (-8.19, -1.6))
                Line((-8.19, -1.6), (-8.19, 1.6))
            make_face(mode=Mode.SUBTRACT)
        extrude(amount=BOSS_EXTRUDE5_DEPTH)

    # Sketch8 → Boss-Extrude6 (add)
    with BuildSketch(Plane(origin=(0, 21.5, 0), x_dir=(1, 0, 0), z_dir=(0, 1, 0))):
        with Locations(Location((0, 0, 0), (0, 0, 270))):
            Circle(SKETCH8_R)
        with Locations(Location((0, 0, 0), (0, 0, 23.269824))):
            Circle(SKETCH8_R_2, mode=Mode.SUBTRACT)
    extrude(amount=BOSS_EXTRUDE6_DEPTH)

    # Sketch7 → Cut-Extrude2 (cut)
    with SkipClean():  # the faces are left unmerged after this step: merging them gives an invalid solid
        with BuildSketch(Plane(origin=(0, 204, 0), x_dir=(1, 0, 0), z_dir=(0, 1, 0))):
            with Locations(Location((0, 0, 0), (0, 0, 270))):
                Circle(SKETCH7_R)
        extrude(amount=-CUT_EXTRUDE2_DEPTH, mode=Mode.SUBTRACT)


solid = part.part
